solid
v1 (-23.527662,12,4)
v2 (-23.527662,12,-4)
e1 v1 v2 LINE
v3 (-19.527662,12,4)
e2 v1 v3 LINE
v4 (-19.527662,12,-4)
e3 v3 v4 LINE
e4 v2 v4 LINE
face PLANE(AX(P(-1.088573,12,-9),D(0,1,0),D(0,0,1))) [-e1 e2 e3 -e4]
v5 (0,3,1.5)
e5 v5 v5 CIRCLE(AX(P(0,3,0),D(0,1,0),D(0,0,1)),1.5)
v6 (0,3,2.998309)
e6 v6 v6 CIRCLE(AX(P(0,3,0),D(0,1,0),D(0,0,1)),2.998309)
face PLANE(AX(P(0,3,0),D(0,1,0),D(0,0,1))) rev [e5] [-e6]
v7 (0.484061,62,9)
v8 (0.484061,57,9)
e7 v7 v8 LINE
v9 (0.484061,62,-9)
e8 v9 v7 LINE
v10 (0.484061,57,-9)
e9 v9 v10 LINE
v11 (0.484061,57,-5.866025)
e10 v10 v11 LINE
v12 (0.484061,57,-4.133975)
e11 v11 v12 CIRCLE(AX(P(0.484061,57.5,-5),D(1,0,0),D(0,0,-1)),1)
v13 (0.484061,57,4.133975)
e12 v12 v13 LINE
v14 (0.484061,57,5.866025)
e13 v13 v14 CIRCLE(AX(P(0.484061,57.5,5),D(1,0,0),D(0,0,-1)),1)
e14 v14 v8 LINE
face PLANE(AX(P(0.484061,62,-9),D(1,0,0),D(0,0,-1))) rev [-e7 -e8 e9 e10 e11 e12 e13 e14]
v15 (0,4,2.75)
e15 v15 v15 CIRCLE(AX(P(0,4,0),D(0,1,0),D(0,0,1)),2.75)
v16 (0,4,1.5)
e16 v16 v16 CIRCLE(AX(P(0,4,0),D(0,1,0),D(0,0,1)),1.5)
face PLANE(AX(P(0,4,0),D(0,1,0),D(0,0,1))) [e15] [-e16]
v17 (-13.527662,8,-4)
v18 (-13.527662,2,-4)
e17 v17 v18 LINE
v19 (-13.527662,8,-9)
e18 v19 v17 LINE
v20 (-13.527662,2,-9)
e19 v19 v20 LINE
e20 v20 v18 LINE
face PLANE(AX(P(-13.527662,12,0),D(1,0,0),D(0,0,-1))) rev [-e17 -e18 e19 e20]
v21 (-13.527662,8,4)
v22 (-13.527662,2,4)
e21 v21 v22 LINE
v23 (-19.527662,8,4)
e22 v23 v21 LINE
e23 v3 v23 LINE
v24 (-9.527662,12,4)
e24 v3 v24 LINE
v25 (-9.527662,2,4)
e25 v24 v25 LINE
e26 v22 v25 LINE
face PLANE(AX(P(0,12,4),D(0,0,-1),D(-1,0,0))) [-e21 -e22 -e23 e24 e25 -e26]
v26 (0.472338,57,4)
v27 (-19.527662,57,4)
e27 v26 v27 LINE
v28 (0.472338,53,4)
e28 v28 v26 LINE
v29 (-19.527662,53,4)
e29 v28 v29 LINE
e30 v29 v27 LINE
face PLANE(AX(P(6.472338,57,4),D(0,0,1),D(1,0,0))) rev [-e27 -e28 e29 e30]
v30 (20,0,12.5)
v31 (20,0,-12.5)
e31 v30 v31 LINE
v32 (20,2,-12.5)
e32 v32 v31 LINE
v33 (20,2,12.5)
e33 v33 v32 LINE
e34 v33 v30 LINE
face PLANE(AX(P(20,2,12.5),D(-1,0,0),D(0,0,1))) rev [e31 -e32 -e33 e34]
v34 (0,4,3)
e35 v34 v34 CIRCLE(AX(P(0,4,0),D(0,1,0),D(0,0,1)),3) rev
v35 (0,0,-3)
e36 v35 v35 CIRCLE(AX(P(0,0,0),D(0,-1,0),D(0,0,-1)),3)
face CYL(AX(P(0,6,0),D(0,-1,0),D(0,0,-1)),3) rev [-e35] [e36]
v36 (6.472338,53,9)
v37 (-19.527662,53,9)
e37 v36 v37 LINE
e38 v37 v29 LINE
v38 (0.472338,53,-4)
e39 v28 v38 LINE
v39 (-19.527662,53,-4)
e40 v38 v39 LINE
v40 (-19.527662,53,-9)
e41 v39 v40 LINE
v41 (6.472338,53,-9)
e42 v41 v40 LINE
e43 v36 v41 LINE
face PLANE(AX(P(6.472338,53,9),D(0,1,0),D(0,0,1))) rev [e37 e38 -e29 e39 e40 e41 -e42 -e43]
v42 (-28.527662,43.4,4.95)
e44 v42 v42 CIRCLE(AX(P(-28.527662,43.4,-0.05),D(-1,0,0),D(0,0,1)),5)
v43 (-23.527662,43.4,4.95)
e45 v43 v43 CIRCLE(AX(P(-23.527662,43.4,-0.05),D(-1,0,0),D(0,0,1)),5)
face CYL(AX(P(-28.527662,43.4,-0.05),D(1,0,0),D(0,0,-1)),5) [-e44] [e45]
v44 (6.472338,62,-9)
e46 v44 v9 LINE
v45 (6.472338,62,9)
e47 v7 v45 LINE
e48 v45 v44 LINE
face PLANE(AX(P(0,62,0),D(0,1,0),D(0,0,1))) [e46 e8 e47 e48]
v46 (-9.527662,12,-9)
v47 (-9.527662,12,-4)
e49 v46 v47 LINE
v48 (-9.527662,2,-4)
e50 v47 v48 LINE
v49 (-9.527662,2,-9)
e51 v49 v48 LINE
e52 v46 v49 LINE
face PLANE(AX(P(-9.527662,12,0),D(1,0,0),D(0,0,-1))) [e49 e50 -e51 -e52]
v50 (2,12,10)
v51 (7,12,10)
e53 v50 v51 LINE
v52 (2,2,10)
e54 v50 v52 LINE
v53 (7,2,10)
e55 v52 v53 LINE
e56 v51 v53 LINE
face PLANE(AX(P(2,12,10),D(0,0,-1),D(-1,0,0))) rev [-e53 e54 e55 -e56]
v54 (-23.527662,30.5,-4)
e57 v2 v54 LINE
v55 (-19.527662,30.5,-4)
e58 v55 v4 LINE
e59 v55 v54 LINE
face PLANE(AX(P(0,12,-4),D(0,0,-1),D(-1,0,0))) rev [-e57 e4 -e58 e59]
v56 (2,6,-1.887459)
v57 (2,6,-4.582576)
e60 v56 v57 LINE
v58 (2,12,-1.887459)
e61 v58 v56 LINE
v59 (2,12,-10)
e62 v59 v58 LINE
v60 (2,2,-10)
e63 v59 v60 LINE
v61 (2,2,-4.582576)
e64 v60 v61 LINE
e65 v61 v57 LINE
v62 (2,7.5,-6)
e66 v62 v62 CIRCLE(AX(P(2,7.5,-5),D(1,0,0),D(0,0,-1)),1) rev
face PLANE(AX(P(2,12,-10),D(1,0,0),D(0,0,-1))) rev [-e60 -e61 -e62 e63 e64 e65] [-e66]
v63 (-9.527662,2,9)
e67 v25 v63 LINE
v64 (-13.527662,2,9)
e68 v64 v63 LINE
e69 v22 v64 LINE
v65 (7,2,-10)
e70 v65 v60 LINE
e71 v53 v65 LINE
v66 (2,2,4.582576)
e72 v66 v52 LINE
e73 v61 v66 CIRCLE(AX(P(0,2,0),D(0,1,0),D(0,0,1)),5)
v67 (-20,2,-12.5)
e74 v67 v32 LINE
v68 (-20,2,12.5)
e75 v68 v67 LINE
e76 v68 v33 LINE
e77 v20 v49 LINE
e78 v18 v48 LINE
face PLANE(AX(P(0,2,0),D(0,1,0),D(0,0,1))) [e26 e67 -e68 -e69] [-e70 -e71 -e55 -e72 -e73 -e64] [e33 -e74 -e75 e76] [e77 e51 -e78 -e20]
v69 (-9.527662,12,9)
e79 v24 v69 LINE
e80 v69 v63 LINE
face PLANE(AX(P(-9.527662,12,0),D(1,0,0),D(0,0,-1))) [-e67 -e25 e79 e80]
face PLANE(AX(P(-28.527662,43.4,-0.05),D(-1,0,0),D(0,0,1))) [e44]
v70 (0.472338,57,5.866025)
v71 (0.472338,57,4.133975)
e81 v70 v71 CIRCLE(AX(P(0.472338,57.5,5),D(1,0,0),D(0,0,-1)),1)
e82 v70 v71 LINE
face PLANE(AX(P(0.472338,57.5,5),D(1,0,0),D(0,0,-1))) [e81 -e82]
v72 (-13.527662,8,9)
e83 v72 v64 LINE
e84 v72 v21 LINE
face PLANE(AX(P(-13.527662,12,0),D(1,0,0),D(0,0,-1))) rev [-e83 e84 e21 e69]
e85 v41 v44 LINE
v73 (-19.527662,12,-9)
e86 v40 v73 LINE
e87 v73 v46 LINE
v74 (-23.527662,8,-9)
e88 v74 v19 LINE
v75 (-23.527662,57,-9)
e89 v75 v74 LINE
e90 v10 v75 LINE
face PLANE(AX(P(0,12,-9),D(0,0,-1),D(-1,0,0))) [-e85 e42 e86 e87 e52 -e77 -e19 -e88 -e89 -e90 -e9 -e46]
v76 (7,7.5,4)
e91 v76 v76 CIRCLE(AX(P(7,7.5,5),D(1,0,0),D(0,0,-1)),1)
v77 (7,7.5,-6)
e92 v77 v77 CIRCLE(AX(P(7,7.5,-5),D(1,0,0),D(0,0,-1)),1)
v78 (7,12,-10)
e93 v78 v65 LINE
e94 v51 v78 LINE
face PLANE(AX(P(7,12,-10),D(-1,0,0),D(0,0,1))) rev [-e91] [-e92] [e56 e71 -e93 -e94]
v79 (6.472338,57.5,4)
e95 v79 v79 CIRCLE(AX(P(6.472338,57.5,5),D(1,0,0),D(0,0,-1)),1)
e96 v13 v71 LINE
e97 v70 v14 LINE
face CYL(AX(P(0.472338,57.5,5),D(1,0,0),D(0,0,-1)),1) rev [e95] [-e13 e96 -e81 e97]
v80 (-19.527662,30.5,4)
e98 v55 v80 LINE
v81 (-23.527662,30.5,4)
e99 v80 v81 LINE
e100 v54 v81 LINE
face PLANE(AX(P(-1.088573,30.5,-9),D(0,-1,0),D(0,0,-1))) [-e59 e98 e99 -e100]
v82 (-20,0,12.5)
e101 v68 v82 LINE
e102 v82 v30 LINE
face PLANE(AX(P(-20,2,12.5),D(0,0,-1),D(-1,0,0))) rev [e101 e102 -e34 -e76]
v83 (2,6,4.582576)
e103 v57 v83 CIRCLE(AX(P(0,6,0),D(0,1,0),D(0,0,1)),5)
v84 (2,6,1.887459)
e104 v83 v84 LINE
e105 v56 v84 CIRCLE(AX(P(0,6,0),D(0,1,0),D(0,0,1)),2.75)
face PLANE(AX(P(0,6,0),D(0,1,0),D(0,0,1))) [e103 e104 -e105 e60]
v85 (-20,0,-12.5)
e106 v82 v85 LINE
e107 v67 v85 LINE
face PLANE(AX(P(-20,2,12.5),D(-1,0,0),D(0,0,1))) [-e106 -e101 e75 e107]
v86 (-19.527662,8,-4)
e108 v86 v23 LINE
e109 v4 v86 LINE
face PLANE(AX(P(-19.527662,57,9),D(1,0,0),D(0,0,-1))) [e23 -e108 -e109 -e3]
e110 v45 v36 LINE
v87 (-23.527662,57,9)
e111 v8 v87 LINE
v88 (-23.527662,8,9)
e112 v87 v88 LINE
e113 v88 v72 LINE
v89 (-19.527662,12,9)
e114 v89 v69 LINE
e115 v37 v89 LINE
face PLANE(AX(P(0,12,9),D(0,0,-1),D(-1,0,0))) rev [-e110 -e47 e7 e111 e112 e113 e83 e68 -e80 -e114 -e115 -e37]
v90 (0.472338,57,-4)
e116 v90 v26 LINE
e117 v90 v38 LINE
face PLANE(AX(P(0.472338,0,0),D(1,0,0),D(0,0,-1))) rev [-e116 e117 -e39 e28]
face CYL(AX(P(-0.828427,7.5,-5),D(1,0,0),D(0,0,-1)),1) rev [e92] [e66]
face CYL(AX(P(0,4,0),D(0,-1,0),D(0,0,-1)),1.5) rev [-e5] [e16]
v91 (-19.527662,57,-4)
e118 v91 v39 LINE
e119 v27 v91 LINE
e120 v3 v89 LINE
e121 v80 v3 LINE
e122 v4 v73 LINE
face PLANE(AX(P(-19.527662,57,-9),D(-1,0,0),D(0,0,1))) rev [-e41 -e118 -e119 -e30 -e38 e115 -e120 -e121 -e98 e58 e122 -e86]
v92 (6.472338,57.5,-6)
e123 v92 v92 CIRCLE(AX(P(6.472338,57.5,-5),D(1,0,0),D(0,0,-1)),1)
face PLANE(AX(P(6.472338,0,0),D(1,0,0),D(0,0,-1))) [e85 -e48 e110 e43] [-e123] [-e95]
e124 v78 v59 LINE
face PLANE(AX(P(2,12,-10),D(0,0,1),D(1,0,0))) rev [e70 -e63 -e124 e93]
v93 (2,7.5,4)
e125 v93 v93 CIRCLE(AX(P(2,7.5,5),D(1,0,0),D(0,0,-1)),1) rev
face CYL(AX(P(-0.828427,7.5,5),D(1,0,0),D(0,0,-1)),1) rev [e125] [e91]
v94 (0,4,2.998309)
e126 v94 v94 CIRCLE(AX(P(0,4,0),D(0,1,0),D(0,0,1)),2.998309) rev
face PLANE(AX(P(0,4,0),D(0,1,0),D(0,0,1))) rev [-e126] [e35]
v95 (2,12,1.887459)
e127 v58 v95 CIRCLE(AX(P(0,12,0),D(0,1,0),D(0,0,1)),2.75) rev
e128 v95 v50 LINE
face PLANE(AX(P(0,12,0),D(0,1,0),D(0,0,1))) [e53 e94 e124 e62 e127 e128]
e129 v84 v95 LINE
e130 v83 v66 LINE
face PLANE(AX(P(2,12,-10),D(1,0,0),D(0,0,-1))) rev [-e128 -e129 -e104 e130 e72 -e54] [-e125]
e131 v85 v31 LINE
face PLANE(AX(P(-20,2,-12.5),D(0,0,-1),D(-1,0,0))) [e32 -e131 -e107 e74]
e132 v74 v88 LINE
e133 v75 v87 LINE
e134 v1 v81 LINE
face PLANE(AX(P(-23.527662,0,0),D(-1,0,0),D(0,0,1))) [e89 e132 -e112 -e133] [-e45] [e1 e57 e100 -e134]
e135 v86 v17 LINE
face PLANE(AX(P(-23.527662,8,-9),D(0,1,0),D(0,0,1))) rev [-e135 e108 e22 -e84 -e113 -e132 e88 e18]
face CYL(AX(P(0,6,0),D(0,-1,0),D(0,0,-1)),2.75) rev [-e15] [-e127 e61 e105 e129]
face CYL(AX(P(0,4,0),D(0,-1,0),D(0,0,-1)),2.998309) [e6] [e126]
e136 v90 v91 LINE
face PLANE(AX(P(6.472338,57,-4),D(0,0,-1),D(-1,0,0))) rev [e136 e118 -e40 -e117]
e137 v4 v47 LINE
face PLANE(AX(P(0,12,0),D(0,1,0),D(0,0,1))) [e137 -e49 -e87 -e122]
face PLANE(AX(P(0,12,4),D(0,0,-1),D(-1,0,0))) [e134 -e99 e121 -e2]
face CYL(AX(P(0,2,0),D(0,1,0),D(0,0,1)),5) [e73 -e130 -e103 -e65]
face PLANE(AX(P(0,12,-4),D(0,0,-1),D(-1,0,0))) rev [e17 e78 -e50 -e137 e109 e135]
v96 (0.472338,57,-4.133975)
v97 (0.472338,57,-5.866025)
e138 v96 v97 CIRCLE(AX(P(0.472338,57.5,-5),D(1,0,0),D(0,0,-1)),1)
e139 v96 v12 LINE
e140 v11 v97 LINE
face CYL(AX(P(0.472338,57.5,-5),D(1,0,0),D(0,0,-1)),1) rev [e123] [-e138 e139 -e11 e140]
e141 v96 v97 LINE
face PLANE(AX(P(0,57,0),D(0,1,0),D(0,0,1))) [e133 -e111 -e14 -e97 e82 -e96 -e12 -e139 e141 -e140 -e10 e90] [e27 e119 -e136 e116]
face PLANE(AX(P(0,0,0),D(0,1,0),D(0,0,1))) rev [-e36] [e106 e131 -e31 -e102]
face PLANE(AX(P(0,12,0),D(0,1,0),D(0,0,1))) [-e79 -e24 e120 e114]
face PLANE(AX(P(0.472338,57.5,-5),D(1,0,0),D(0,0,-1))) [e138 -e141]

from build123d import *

# Parameters (mm, degrees)
SKETCH1_W                  = 40
SKETCH1_H                  = 25
BOSS_EXTRUDE1_DEPTH        = 2
SKETCH2_W                  = 5
SKETCH2_H                  = 20
BOSS_EXTRUDE2_DEPTH        = 10
SKETCH4_W                  = 19.965035534
SKETCH4_H                  = 6
BOSS_EXTRUDE3_DEPTH        = 5
SKETCH5_R                  = 1
CUT_EXTRUDE2_DEPTH         = 5
SKETCH6_W                  = 4
SKETCH6_H                  = 5
BOSS_EXTRUDE4_DEPTH        = 10
SKETCH8_W                  = 5
SKETCH8_H                  = 4
BOSS_EXTRUDE5_DEPTH        = 10
SKETCH9_W                  = 4
SKETCH9_H                  = 5
BOSS_EXTRUDE6_DEPTH        = 45
SKETCH12_W                 = 18
SKETCH12_H                 = 4
BOSS_EXTRUDE8_DEPTH        = 4
SKETCH13_W                 = 5
SKETCH13_H                 = 4
BOSS_EXTRUDE9_DEPTH        = 26
SKETCH14_W                 = 18
SKETCH14_H                 = 4
BOSS_EXTRUDE10_DEPTH       = 6
SKETCH16_W                 = 5.988277512
SKETCH16_H                 = 18
BOSS_EXTRUDE11_DEPTH       = 5
SKETCH15_R                 = 1
CUT_EXTRUDE3_DEPTH         = 6
SKETCH17_R                 = 3
CUT_EXTRUDE5_DEPTH         = 6
SKETCH24_W                 = 8
SKETCH24_H                 = 18.5
BOSS_EXTRUDE18_DEPTH       = 4
BOSS_EXTRUDE20_START       = -1
SKETCH20_R                 = 5
SKETCH20_R_2               = 3
BOSS_EXTRUDE20_DEPTH       = 1
BOSS_EXTRUDE21_OUTLINE_R   = 2.998308623
BOSS_EXTRUDE21_OUTLINE_R_2 = 1.5
BOSS_EXTRUDE21_DEPTH       = 1
SKETCH27_R                 = 5
SKETCH27_R_2               = 2.75
BOSS_EXTRUDE22_DEPTH       = 2
SKETCH28_R                 = 2.75
CUT_EXTRUDE10_DEPTH        = 10
SKETCH29_R                 = 5
BOSS_EXTRUDE23_DEPTH       = 5


# Read off the part's stored shape, not the designer's step: Boss-Extrude21
with BuildPart() as part:
    # Sketch1 → Boss-Extrude1 (new body)
    with BuildSketch(Plane(origin=(0, 0, 0), x_dir=(1, 0, 0), z_dir=(0, 1, 0))):
        Rectangle(SKETCH1_W, SKETCH1_H)
    extrude(amount=BOSS_EXTRUDE1_DEPTH)

    # Sketch2 → Boss-Extrude2 (add)
    with BuildSketch(Plane(origin=(0, 2, 0), x_dir=(1, 0, 0), z_dir=(0, 1, 0))):
        with Locations((4.5, 0)):
            Rectangle(SKETCH2_W, SKETCH2_H)
    extrude(amount=BOSS_EXTRUDE2_DEPTH)

    # Sketch4 → Boss-Extrude3 (add)
    with BuildSketch(Plane(origin=(7, 0, 0), x_dir=(0, 0, -1), z_dir=(1, 0, 0))):
        with Locations((-0.017482233, 9)):
            Rectangle(SKETCH4_W, SKETCH4_H)
    extrude(amount=-BOSS_EXTRUDE3_DEPTH)

    # Sketch5 → Cut-Extrude2 (cut)
    with BuildSketch(Plane(origin=(7, 0, 0), x_dir=(0, 0, -1), z_dir=(1, 0, 0))):
        with Locations((5, 7.5)):
            Circle(SKETCH5_R)
        with Locations((-5, 7.5)):
            Circle(SKETCH5_R)
    extrude(amount=-CUT_EXTRUDE2_DEPTH, mode=Mode.SUBTRACT)

    # Sketch6 → Boss-Extrude4 (add)
    with BuildSketch(Plane(origin=(0, 2, 0), x_dir=(1, 0, 0), z_dir=(0, 1, 0))):
        with Locations((-11.527661753, -6.5)):
            Rectangle(SKETCH6_W, SKETCH6_H)
        with Locations((-11.527661753, 6.5)):
            Rectangle(SKETCH6_W, SKETCH6_H)
    extrude(amount=BOSS_EXTRUDE4_DEPTH)

    # Sketch8 → Boss-Extrude5 (add)
    with BuildSketch(Plane.ZY.offset(13.527661753)):
        with Locations((-6.5, 10)):
            Rectangle(SKETCH8_W, SKETCH8_H)
    boss_extrude5 = extrude(amount=BOSS_EXTRUDE5_DEPTH)

    # Mirror1: Boss-Extrude5 across plane
    add(boss_extrude5.mirror(Plane(origin=(0, 0, 0), x_dir=(1, 0, 0), z_dir=(0, 0, -1))))

    # Sketch9 → Boss-Extrude6 (add)
    with BuildSketch(Plane(origin=(0, 12, 0), x_dir=(1, 0, 0), z_dir=(0, 1, 0))):
        with Locations((-21.527661753, 6.5)):
            Rectangle(SKETCH9_W, SKETCH9_H)
    boss_extrude6 = extrude(amount=BOSS_EXTRUDE6_DEPTH)

    # Mirror2: Boss-Extrude5 across plane
    add(boss_extrude5.mirror(Plane(origin=(0, 0, 0), x_dir=(1, 0, 0), z_dir=(0, 0, -1))))

    # Mirror3: Boss-Extrude6 across plane
    add(boss_extrude6.mirror(Plane(origin=(0, 0, 0), x_dir=(1, 0, 0), z_dir=(0, 0, -1))))

    # Sketch12 → Boss-Extrude8 (add)
    with BuildSketch(Plane.ZY.offset(23.527661753)):
        with Locations((0, 55)):
            Rectangle(SKETCH12_W, SKETCH12_H)
        with Locations((0, 10)):
            Rectangle(SKETCH12_W, SKETCH12_H)
        with Locations((0, 32.5)):
            Rectangle(SKETCH12_W, SKETCH12_H)
    extrude(amount=-BOSS_EXTRUDE8_DEPTH)

    # Sketch13 → Boss-Extrude9 (add)
    with BuildSketch(Plane(origin=(-19.527661753, 0, 0), x_dir=(0, 0, -1), z_dir=(1, 0, 0))):
        with Locations((-6.5, 55)):
            Rectangle(SKETCH13_W, SKETCH13_H)
        with Locations((6.5, 55)):
            Rectangle(SKETCH13_W, SKETCH13_H)
    extrude(amount=BOSS_EXTRUDE9_DEPTH)

    # Sketch14 → Boss-Extrude10 (add)
    with BuildSketch(Plane(origin=(6.472338247, 0, 0), x_dir=(0, 0, -1), z_dir=(1, 0, 0))):
        with Locations((0, 55)):
            Rectangle(SKETCH14_W, SKETCH14_H)
    extrude(amount=-BOSS_EXTRUDE10_DEPTH)

    # Sketch16 → Boss-Extrude11 (add)
    with BuildSketch(Plane(origin=(0, 57, 0), x_dir=(1, 0, 0), z_dir=(0, 1, 0))):
        with Locations((3.478199491, 0)):
            Rectangle(SKETCH16_W, SKETCH16_H)
    extrude(amount=BOSS_EXTRUDE11_DEPTH)

    # Sketch15 → Cut-Extrude3 (cut)
    with BuildSketch(Plane(origin=(6.472338247, 0, 0), x_dir=(0, 0, -1), z_dir=(1, 0, 0))):
        with Locations((-5, 57.5)):
            Circle(SKETCH15_R)
        with Locations((5, 57.5)):
            Circle(SKETCH15_R)
    extrude(amount=-CUT_EXTRUDE3_DEPTH, mode=Mode.SUBTRACT)

    # Sketch17 → Cut-Extrude5 (cut)
    with BuildSketch(Plane.XZ):
        with Locations(Location((0, 0, 0), (0, 0, 270))):
            Circle(SKETCH17_R)
    extrude(amount=-CUT_EXTRUDE5_DEPTH, mode=Mode.SUBTRACT)

    # Sketch24 → Boss-Extrude18 (add)
    with BuildSketch(Plane.ZY.offset(23.527661753)):
        with Locations((0, 43.75)):
            Rectangle(SKETCH24_W, SKETCH24_H)
    extrude(amount=-BOSS_EXTRUDE18_DEPTH)

    # Sketch20 → Boss-Extrude20 (add)
    with BuildSketch(Plane(origin=(0, 3, 0), x_dir=(1, 0, 0), z_dir=(0, 1, 0)).offset(BOSS_EXTRUDE20_START)):
        Circle(SKETCH20_R)
        with Locations(Location((0, 0, 0), (0, 0, 90))):
            Circle(SKETCH20_R_2, mode=Mode.SUBTRACT)
    extrude(amount=BOSS_EXTRUDE20_DEPTH)

    # Boss-Extrude21 outline → Boss-Extrude21 (add)
    # profile 1 of 2: a face of its own
    with BuildSketch(Plane(origin=(0, 3, 0), x_dir=(1, 0, 0), z_dir=(0, 1, 0))):
        with BuildLine():
            ThreePointArc((2, -2.236067977), (-3, 0), (2, 2.236067977))
            Line((2, 2.236067977), (2, 4.582575695))
            ThreePointArc((2, 4.582575695), (-5, 0), (2, -4.582575695))
            Line((2, -4.582575695), (2, -2.236067977))
        make_face()
    # profile 2 of 2: a face of its own
    with BuildSketch(Plane(origin=(0, 3, 0), x_dir=(1, 0, 0), z_dir=(0, 1, 0))):
        Circle(BOSS_EXTRUDE21_OUTLINE_R)
        Circle(BOSS_EXTRUDE21_OUTLINE_R_2, mode=Mode.SUBTRACT)
    extrude(amount=BOSS_EXTRUDE21_DEPTH)

    # Sketch27 → Boss-Extrude22 (add)
    with BuildSketch(Plane(origin=(0, 4, 0), x_dir=(1, 0, 0), z_dir=(0, 1, 0))):
        Circle(SKETCH27_R)
        with Locations(Location((0, 0, 0), (0, 0, 43.341758227))):
            Circle(SKETCH27_R_2, mode=Mode.SUBTRACT)
    extrude(amount=BOSS_EXTRUDE22_DEPTH)

    # Sketch28 → Cut-Extrude10 (cut)
    with BuildSketch(Plane(origin=(0, 6, 0), x_dir=(1, 0, 0), z_dir=(0, 1, 0))):
        with Locations(Location((0, 0, 0), (0, 0, 43.341758227))):
            Circle(SKETCH28_R)
    extrude(amount=CUT_EXTRUDE10_DEPTH, mode=Mode.SUBTRACT)

    # Sketch29 → Boss-Extrude23 (add)
    with BuildSketch(Plane.ZY.offset(23.527661753)):
        with Locations((-0.05, 43.4)):
            Circle(SKETCH29_R)
    extrude(amount=BOSS_EXTRUDE23_DEPTH)


solid = part.part
